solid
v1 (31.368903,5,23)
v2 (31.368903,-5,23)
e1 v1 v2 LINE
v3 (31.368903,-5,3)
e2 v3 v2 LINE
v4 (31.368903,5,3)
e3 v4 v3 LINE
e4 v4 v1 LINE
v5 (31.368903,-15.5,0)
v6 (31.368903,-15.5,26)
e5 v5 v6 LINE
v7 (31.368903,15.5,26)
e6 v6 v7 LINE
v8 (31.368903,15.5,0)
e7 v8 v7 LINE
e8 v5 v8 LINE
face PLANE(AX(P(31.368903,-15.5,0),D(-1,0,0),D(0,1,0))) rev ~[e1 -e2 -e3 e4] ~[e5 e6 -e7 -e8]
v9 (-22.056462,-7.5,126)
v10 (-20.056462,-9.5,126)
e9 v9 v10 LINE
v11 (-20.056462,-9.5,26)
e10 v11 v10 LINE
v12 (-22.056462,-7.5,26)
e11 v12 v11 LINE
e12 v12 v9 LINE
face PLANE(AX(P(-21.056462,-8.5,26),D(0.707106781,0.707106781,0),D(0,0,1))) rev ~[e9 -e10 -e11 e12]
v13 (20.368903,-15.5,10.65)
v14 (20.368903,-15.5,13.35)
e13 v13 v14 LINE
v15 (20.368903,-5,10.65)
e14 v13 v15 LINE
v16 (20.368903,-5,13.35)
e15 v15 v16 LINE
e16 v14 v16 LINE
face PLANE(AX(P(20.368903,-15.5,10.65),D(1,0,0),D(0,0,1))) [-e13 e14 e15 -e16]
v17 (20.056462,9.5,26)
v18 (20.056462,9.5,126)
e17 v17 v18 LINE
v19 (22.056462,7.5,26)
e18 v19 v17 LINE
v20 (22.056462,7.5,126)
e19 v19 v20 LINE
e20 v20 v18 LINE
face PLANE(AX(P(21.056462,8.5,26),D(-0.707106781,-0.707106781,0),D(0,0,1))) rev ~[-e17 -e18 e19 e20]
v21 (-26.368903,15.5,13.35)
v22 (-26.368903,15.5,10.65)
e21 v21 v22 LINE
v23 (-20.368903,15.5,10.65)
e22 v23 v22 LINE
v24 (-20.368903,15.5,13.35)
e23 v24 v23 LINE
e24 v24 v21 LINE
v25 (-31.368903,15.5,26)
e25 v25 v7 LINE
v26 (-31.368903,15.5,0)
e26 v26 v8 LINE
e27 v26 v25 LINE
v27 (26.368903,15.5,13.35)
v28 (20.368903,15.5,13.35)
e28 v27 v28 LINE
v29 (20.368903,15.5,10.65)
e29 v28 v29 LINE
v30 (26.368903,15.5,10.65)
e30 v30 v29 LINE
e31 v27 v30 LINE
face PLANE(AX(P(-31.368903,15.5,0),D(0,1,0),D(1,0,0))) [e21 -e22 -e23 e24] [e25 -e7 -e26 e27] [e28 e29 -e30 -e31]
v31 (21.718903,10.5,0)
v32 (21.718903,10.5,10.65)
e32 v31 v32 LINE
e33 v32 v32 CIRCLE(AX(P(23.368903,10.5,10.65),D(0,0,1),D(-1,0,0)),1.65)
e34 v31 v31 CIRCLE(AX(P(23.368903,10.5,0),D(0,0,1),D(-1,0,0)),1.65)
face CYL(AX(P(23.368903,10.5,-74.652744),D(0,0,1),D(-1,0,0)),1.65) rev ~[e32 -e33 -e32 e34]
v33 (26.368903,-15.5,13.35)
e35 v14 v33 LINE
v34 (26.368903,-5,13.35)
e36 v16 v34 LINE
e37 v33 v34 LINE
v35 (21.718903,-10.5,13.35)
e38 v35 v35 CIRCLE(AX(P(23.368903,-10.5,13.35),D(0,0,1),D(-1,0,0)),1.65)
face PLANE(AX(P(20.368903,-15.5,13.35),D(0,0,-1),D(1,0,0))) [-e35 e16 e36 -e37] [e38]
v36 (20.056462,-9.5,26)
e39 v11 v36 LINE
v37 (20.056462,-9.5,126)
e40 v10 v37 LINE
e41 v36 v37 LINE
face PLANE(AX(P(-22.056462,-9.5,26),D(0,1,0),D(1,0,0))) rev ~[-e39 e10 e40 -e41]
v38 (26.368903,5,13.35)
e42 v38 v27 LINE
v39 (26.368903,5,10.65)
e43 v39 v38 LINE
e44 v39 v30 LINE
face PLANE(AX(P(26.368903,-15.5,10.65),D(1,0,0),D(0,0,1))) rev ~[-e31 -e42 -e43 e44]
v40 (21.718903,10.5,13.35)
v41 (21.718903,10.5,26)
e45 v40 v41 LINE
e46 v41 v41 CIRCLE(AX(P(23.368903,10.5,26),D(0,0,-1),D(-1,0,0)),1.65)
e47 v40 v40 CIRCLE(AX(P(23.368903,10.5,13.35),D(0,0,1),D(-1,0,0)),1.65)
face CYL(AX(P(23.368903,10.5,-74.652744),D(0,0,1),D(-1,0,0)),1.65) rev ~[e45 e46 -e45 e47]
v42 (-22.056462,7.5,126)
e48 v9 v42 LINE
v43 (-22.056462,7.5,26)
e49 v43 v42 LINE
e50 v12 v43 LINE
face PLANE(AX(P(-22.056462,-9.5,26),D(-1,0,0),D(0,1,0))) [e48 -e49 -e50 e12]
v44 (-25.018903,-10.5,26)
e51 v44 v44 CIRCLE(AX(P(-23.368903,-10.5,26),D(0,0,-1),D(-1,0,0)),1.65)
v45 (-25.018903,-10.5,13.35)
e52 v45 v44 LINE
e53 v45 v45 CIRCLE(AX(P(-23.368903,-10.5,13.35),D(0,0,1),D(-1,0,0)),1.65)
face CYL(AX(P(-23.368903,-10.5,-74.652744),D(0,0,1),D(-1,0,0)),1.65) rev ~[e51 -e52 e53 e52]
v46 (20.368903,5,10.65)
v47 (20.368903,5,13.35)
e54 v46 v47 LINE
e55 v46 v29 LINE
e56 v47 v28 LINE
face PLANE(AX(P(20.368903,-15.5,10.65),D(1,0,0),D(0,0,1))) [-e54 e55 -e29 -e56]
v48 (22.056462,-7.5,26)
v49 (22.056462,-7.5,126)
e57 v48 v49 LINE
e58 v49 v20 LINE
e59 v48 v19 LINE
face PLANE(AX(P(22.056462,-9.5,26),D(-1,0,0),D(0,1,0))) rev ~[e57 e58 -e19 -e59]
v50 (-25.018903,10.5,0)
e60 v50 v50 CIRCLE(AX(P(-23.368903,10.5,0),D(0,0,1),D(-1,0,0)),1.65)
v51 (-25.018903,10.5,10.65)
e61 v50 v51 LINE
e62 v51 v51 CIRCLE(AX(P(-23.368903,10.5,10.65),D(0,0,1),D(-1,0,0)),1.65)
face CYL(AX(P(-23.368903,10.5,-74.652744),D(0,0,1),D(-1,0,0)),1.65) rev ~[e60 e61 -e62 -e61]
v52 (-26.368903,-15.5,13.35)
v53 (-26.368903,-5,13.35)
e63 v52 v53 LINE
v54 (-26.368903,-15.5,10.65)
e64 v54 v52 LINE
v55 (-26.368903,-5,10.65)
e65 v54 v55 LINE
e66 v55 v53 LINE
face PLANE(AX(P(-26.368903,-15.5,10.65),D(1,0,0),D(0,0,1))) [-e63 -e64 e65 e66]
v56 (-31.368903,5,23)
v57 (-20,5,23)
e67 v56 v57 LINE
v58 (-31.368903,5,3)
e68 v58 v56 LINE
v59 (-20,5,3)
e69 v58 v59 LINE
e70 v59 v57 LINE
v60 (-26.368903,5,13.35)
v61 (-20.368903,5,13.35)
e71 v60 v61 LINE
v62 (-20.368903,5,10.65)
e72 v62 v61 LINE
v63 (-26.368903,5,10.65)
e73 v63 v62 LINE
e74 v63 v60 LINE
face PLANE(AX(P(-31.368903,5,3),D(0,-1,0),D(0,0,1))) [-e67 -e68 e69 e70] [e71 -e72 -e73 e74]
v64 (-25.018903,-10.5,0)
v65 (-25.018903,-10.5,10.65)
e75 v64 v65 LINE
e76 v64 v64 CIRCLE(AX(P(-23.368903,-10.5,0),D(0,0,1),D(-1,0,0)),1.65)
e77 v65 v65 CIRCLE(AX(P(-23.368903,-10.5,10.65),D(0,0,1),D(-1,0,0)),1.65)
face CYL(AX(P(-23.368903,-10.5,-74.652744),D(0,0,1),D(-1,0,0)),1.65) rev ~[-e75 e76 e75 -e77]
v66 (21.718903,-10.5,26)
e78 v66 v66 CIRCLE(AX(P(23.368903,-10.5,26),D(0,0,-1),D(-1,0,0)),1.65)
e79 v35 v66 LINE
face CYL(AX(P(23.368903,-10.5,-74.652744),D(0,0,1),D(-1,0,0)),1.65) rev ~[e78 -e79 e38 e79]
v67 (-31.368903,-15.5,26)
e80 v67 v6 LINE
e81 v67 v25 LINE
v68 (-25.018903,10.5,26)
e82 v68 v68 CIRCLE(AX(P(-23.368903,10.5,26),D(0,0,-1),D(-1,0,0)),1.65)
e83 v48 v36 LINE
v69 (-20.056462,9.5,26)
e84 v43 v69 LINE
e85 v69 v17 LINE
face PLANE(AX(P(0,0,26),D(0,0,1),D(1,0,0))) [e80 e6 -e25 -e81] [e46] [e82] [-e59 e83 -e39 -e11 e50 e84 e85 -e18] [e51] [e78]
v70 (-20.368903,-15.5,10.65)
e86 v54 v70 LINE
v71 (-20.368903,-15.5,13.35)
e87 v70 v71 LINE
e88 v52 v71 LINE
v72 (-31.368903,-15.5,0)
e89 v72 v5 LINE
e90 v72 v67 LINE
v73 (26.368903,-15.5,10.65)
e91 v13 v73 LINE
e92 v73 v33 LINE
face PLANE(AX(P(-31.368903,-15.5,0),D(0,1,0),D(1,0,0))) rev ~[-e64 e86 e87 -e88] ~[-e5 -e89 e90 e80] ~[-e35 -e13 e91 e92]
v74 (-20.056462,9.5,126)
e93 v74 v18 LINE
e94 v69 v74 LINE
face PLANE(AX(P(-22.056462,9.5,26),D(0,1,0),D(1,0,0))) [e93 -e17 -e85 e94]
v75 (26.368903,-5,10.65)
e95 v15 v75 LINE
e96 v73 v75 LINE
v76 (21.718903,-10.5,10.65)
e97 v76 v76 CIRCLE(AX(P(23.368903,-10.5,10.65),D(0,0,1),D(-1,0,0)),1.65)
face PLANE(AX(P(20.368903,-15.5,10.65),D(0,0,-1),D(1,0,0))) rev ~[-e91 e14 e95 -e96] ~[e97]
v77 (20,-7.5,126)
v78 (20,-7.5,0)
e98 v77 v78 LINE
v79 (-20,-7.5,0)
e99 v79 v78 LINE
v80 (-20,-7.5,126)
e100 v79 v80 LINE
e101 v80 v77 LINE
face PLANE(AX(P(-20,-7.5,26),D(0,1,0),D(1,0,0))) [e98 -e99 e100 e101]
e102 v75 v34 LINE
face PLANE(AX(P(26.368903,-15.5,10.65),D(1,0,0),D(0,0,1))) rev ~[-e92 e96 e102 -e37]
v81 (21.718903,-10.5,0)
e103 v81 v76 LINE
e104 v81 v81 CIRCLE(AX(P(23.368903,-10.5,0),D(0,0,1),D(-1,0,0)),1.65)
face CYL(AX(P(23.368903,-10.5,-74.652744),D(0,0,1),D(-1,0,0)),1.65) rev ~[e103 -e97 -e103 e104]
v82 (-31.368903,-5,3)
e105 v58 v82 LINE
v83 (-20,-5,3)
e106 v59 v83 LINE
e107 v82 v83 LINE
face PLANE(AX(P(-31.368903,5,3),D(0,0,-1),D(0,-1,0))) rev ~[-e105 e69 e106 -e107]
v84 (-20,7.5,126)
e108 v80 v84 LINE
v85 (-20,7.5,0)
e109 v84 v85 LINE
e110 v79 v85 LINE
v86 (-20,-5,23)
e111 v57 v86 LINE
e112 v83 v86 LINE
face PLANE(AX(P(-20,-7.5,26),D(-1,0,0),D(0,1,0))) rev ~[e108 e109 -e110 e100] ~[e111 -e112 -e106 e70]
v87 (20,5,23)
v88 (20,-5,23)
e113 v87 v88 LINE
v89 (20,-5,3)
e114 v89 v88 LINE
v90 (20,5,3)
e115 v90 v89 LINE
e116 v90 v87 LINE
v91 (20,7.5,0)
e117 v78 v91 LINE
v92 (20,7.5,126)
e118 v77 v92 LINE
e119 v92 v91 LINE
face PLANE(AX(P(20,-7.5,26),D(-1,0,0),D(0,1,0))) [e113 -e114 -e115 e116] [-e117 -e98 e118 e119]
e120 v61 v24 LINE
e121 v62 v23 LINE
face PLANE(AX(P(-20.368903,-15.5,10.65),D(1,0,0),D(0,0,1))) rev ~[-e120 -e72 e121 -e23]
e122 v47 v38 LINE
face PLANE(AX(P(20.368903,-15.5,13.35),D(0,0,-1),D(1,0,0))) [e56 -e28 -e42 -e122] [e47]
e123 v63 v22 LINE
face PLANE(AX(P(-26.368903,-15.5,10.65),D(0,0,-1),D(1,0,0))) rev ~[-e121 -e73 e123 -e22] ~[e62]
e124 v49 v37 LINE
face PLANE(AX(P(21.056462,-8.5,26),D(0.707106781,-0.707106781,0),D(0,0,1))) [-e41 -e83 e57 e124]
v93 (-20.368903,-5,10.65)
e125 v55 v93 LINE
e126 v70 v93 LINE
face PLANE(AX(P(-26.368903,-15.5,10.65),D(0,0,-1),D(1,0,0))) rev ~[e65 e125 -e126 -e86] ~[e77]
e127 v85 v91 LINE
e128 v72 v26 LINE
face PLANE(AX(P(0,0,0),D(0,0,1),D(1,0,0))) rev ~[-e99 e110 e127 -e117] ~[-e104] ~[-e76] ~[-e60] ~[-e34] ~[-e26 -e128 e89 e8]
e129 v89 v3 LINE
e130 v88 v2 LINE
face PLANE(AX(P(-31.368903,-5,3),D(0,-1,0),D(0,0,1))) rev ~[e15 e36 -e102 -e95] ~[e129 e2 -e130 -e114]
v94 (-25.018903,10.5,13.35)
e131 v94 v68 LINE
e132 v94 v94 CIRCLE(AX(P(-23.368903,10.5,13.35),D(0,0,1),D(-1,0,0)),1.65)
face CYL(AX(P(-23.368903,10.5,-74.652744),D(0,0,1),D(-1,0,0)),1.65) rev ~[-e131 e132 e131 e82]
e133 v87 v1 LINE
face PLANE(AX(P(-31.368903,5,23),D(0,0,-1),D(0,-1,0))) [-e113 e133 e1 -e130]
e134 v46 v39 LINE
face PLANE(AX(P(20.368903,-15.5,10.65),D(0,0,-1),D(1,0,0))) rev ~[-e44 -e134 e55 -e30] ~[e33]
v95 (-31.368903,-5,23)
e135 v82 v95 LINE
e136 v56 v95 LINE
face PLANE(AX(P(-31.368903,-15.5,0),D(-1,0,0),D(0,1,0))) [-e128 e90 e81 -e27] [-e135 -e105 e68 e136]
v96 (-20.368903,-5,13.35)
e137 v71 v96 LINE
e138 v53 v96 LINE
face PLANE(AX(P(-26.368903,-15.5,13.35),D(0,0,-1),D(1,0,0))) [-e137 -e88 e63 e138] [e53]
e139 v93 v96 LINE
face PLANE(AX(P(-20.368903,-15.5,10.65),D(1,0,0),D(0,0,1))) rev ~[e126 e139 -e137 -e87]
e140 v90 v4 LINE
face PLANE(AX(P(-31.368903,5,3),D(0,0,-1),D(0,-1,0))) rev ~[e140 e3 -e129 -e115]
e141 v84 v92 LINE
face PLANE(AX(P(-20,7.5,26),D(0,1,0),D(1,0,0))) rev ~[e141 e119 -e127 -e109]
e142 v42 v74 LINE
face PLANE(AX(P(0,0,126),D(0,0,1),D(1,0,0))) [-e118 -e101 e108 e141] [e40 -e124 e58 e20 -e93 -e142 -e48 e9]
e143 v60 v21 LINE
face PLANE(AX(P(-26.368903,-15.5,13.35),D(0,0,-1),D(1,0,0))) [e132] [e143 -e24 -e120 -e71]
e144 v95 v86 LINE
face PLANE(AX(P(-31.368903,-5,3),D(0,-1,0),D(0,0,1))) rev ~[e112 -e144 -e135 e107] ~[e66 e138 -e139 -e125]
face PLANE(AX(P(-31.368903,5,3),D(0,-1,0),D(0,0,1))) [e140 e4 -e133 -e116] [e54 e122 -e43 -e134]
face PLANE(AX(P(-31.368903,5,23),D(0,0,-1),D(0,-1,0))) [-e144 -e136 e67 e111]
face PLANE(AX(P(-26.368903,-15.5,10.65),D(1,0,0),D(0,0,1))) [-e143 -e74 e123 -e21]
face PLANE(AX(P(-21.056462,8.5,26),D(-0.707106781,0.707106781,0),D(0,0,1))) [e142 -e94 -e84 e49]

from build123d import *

# Parameters (mm, degrees)
F0_W     = 62.7378050089
F0_H     = 31
F0_W_2   = 40
F0_H_2   = 15
F1_DEPTH = 26
F2_W     = 10
F2_H     = 20
F3_DEPTH = 62.7388050089
F4_D     = 3.3
F5_W     = 44.1129240592
F5_H     = 19
F5_W_2   = 40
F5_H_2   = 15
F6_DEPTH = 100
F7_SIZE  = 2
F8_W     = 6
F8_H     = 2.7
F9_DEPTH = 31.001


with BuildPart() as f1:
    # F0 (on Top) → F1 (new body)
    with BuildSketch(Plane.XY):
        Rectangle(F0_W, F0_H)
        Rectangle(F0_W_2, F0_H_2, mode=Mode.SUBTRACT)
    extrude(amount=F1_DEPTH)

    # F2 (on face) → F3 (cut, through all)
    with BuildSketch(Plane(origin=(-31.3689025044, 0, 0), x_dir=(0, -1, 0), z_dir=(-1, 0, 0))):
        with Locations((0, 13)):
            Rectangle(F2_W, F2_H)
    extrude(amount=-F3_DEPTH, mode=Mode.SUBTRACT)

    # F4 (through all)
    with Locations(Plane(origin=(0, 0, 0), x_dir=(1, 0, 0), z_dir=(0, 0, -1))):
        with Locations((-23.3689025044, -10.5), (-23.3689025044, 10.5), (23.3689025044, 10.5), (23.3689025044, -10.5)):
            Hole(F4_D / 2)

    # F5 (on face) → F6 (join)
    with BuildSketch(Plane.XY.offset(26)):
        Rectangle(F5_W, F5_H)
        Rectangle(F5_W_2, F5_H_2, mode=Mode.SUBTRACT)
    extrude(amount=F6_DEPTH)

    # F7
    f7_edges = [f1.edges().sort_by_distance(p)[0] for p in [
        (22.056462, 9.5, 76),
        (-22.056462, 9.5, 76),
        (22.056462, -9.5, 76),
        (-22.056462, -9.5, 76),
    ]]
    chamfer(f7_edges, length=F7_SIZE)

    # F8 (on face) → F9 (cut, through all)
    with BuildSketch(Plane.XZ.offset(15.5)):
        with Locations((-23.3689025044, 12)):
            Rectangle(F8_W, F8_H)
        with Locations((23.3689025044, 12)):
            Rectangle(F8_W, F8_H)
    extrude(amount=-F9_DEPTH, mode=Mode.SUBTRACT)


solid = f1.part
